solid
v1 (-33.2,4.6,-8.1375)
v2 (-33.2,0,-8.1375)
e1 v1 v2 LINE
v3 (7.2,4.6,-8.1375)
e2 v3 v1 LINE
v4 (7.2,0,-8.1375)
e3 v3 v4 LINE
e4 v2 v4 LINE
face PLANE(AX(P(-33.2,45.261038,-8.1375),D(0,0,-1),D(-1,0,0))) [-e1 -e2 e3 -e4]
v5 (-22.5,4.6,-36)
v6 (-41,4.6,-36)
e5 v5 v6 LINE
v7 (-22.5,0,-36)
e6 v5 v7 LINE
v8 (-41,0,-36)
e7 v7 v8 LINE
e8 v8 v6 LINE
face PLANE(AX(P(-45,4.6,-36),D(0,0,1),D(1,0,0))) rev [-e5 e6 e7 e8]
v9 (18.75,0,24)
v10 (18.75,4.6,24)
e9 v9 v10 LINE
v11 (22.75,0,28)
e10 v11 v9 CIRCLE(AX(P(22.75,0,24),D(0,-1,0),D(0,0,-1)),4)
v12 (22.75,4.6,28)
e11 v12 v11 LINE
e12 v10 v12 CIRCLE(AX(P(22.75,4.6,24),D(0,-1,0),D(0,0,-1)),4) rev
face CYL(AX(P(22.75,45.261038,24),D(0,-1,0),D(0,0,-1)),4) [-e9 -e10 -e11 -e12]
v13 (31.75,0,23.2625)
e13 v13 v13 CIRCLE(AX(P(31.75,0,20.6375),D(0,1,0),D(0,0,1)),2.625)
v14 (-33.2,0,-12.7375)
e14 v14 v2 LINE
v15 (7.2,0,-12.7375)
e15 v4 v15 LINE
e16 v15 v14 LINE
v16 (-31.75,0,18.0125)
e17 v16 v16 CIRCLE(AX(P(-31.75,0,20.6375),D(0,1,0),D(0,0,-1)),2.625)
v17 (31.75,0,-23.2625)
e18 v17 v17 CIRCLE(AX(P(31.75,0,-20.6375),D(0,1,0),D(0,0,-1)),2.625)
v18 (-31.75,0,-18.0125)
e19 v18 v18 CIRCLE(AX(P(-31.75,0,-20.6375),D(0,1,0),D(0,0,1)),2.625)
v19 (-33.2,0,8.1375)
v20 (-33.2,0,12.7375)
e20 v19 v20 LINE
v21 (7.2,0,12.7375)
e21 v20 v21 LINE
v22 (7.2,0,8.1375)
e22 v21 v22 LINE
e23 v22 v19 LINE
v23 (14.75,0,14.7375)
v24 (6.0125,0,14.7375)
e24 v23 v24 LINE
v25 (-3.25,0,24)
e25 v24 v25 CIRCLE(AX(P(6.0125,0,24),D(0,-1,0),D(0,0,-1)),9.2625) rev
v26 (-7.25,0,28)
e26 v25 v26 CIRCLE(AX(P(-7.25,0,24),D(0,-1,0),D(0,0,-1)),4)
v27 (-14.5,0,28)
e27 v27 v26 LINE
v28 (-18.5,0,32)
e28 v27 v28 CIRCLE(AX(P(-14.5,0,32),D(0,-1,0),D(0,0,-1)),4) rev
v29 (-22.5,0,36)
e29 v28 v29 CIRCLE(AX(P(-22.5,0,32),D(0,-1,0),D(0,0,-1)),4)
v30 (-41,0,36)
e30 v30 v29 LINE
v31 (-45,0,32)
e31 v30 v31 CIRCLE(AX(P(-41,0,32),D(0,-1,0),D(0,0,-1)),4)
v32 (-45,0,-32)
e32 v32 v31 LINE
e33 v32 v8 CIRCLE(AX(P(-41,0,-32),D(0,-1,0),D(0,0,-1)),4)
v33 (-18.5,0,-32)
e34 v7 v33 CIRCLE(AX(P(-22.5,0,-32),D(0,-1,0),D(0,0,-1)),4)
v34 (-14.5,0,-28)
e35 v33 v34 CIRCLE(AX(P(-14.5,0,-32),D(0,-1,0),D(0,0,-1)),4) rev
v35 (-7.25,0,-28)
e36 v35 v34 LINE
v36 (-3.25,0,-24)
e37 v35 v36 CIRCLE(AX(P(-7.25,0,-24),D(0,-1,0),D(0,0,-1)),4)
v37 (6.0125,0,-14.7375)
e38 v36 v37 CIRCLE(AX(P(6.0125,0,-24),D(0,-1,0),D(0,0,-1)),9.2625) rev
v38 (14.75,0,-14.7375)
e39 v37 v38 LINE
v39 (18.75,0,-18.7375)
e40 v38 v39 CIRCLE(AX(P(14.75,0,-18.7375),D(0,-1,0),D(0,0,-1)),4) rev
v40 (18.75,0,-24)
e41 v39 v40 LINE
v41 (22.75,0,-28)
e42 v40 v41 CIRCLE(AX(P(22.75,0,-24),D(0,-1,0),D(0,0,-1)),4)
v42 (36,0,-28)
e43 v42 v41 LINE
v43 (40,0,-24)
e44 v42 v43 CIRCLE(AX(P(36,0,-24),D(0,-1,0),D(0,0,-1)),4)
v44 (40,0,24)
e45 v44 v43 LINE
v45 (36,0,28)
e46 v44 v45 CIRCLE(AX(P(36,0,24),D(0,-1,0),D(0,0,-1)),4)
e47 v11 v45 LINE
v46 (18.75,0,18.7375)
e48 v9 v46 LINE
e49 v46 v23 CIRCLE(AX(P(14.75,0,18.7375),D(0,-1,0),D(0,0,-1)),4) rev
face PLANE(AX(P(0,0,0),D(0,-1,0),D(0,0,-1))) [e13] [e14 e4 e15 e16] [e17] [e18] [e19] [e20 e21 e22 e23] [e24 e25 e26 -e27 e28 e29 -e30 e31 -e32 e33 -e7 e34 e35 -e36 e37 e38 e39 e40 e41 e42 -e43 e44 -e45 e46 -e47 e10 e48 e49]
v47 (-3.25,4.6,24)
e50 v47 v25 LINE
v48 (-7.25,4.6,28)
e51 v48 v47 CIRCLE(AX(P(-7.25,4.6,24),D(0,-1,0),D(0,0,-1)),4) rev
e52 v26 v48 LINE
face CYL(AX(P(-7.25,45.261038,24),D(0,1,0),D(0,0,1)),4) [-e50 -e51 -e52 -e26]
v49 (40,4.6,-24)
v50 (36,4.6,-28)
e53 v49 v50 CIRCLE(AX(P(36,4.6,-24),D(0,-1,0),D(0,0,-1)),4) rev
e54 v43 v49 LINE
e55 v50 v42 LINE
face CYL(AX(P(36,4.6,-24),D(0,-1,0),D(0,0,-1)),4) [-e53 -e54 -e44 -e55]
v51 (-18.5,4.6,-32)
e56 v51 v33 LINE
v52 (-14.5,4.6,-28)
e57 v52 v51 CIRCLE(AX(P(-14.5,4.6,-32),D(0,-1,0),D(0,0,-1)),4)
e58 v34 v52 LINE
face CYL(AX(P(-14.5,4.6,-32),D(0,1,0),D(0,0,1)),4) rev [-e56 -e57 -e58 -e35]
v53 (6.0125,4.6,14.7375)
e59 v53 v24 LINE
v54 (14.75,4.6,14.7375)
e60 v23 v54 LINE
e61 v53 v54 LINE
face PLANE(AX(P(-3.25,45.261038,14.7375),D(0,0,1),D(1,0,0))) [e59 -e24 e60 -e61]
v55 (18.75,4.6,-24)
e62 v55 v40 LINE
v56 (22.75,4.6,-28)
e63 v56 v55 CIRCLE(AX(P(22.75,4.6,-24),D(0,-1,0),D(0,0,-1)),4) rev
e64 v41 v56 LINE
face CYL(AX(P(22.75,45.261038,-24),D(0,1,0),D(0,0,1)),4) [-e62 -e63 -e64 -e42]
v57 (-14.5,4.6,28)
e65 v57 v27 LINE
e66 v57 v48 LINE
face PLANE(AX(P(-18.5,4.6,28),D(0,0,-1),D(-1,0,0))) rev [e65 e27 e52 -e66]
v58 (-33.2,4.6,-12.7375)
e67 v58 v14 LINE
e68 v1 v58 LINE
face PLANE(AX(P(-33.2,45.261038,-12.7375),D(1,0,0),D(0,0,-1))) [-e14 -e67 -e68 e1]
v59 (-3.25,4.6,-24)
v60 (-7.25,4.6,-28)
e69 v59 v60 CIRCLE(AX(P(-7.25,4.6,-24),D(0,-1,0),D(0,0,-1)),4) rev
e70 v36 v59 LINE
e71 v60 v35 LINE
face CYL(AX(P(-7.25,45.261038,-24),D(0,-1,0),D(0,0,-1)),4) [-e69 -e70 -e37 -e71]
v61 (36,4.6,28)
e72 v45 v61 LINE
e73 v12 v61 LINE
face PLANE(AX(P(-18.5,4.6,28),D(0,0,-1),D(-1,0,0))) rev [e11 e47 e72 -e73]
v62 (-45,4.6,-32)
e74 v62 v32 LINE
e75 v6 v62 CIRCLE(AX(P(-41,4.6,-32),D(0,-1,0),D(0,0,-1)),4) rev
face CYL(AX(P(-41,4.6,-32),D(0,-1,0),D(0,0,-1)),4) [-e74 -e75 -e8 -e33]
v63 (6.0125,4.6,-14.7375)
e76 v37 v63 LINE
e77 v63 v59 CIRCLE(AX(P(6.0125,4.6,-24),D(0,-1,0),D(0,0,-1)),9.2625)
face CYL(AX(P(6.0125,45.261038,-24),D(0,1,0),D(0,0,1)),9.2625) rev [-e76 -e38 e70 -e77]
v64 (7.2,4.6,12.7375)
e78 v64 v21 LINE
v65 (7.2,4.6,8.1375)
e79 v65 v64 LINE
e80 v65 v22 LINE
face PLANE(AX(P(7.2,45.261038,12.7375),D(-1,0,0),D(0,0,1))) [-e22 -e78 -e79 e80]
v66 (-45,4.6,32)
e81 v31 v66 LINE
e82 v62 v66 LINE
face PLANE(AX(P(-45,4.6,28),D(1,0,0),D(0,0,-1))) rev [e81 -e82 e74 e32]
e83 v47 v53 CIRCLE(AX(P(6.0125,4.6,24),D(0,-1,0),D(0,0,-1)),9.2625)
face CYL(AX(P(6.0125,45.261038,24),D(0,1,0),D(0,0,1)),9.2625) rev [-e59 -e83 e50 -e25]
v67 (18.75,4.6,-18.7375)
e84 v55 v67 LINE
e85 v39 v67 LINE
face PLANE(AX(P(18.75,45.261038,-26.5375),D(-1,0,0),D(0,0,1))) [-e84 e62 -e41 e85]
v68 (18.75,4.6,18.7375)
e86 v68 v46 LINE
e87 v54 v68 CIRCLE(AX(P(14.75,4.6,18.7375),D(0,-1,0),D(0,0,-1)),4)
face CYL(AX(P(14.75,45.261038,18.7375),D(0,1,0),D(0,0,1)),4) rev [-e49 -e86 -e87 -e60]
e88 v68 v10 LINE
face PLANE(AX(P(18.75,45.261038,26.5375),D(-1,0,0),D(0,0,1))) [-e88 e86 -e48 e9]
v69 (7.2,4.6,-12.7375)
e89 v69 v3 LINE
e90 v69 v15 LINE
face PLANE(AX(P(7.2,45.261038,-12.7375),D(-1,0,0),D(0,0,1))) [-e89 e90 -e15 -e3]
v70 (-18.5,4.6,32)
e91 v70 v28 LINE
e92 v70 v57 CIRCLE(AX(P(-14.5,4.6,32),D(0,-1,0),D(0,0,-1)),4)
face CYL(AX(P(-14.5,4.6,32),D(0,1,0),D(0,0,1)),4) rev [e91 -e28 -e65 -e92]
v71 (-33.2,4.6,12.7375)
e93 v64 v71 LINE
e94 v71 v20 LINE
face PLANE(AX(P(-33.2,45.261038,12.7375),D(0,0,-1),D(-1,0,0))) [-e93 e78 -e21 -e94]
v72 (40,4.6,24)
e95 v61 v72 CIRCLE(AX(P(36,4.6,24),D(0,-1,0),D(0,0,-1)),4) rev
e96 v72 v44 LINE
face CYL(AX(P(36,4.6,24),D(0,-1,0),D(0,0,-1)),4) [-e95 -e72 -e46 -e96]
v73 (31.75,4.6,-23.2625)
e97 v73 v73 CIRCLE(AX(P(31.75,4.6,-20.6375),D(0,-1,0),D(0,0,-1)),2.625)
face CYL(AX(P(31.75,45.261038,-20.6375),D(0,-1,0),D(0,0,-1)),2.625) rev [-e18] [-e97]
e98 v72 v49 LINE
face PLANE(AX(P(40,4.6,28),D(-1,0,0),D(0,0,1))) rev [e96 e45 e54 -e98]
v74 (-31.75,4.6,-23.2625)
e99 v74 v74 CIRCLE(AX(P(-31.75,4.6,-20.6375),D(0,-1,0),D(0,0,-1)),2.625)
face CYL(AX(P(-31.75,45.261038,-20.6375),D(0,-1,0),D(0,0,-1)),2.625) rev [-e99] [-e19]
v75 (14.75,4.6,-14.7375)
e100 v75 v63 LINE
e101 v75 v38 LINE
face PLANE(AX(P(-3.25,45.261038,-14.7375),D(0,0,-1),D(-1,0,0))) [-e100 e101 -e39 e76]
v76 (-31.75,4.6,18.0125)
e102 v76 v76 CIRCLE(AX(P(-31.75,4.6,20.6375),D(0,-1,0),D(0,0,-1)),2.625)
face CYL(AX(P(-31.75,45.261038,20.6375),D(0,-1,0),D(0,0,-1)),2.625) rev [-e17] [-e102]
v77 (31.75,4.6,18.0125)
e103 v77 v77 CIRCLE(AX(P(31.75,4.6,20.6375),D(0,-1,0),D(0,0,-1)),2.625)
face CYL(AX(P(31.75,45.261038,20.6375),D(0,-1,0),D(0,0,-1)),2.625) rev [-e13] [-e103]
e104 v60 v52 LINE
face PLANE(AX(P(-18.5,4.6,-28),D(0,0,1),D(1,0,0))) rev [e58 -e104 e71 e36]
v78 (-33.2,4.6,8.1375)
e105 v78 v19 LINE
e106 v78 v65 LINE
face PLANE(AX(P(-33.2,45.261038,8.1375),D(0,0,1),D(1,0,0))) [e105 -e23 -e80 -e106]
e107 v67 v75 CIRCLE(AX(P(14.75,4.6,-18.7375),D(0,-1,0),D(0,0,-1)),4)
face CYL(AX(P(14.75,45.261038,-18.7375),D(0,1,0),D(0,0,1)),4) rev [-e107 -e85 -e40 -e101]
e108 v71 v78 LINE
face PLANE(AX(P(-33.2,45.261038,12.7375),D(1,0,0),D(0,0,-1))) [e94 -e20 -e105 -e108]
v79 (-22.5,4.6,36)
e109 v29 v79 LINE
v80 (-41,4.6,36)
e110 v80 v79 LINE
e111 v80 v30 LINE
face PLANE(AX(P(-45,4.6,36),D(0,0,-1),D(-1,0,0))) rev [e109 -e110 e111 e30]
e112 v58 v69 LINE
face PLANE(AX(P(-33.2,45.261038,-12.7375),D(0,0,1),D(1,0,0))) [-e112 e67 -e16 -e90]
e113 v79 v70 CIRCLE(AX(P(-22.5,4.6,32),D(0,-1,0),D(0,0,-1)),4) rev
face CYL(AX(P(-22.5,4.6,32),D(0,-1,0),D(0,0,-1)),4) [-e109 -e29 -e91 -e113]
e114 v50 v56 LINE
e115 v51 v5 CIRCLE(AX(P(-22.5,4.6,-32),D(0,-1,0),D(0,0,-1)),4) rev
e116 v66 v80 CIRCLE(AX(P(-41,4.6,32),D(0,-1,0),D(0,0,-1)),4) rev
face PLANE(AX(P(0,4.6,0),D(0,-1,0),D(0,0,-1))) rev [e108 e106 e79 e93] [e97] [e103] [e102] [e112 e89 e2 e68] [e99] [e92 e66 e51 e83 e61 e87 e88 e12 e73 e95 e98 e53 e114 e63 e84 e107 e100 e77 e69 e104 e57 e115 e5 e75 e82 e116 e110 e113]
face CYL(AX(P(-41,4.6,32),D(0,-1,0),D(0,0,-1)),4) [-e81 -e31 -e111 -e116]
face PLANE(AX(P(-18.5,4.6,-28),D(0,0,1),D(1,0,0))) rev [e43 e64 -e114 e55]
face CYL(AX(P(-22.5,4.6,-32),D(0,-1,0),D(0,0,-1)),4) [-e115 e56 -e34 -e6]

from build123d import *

# Parameters (mm, degrees)
EXTRUDE_1_DEPTH     = 4.6
SKETCH_1_R          = 2.625
SKETCH_1_W          = 40.4
SKETCH_1_H          = 4.6
CUT_EXTRUDE_1_DEPTH = 4.6
FILLET_2_R          = 4
FILLET_3_R          = 9.2625


with BuildPart() as part:
    # 草图3 → 凸台-拉伸1 (new body)
    with BuildSketch(Plane(origin=(0, 0, 0), x_dir=(1, 0, 0), z_dir=(0, 1, 0))):
        Polygon((-18.5, -28), (40, -28), (40, 28), (-18.5, 28), (-18.5, 36), (-45, 36), (-45, 28), (-45, -28), (-45, -36), (-18.5, -36), align=None)
    extrude(amount=EXTRUDE_1_DEPTH)

    # 草图1 → 切除-拉伸1 (cut)
    with BuildSketch(Plane(origin=(0, 0, 0), x_dir=(1, 0, 0), z_dir=(0, 1, 0))):
        with Locations(Location((-31.75, 20.6375, 0), (0, 0, 90))):
            Circle(SKETCH_1_R)
        with Locations(Location((31.75, 20.6375, 0), (0, 0, 90))):
            Circle(SKETCH_1_R)
        with Locations(Location((31.75, -20.6375, 0), (0, 0, 90))):
            Circle(SKETCH_1_R)
        with Locations(Location((-31.75, -20.6375, 0), (0, 0, 90))):
            Circle(SKETCH_1_R)
        with Locations((-13, -10.4375)):
            Rectangle(SKETCH_1_W, SKETCH_1_H)
        with Locations((-13, 10.4375)):
            Rectangle(SKETCH_1_W, SKETCH_1_H)
        Polygon((-3.25, -26.5375), (-3.25, -14.7375), (18.75, -14.7375), (18.75, -26.5375), (18.75, -29.869530405), (-3.25, -29.869530405), align=None)
        Polygon((-3.25, 14.7375), (18.75, 14.7375), (18.75, 26.5375), (18.75, 29.869530405), (-3.25, 29.869530405), (-3.25, 26.5375), align=None)
    extrude(amount=CUT_EXTRUDE_1_DEPTH, mode=Mode.SUBTRACT)

    # 圆角2
    fillet_2_edges = [part.edges().sort_by_distance(p)[0] for p in [
        (-3.25, 2.3, -28),
        (18.75, 2.3, -28),
        (40, 2.3, -28),
        (40, 2.3, 28),
        (18.75, 2.3, 28),
        (-3.25, 2.3, 28),
        (18.75, 2.3, -14.7375),
        (18.75, 2.3, 14.7375),
        (-18.5, 2.3, 28),
        (-18.5, 2.3, 36),
        (-45, 2.3, 36),
        (-45, 2.3, -36),
        (-18.5, 2.3, -36),
        (-18.5, 2.3, -28),
    ]]
    fillet(fillet_2_edges, radius=FILLET_2_R - 0.0001)  # a hair under: the kernel refuses the full size

    # 圆角3
    fillet_3_edges = [part.edges().sort_by_distance(p)[0] for p in [
        (-3.25, 2.3, -14.7375),
        (-3.25, 2.3, 14.7375),
    ]]
    fillet(fillet_3_edges, radius=FILLET_3_R)


solid = part.part
